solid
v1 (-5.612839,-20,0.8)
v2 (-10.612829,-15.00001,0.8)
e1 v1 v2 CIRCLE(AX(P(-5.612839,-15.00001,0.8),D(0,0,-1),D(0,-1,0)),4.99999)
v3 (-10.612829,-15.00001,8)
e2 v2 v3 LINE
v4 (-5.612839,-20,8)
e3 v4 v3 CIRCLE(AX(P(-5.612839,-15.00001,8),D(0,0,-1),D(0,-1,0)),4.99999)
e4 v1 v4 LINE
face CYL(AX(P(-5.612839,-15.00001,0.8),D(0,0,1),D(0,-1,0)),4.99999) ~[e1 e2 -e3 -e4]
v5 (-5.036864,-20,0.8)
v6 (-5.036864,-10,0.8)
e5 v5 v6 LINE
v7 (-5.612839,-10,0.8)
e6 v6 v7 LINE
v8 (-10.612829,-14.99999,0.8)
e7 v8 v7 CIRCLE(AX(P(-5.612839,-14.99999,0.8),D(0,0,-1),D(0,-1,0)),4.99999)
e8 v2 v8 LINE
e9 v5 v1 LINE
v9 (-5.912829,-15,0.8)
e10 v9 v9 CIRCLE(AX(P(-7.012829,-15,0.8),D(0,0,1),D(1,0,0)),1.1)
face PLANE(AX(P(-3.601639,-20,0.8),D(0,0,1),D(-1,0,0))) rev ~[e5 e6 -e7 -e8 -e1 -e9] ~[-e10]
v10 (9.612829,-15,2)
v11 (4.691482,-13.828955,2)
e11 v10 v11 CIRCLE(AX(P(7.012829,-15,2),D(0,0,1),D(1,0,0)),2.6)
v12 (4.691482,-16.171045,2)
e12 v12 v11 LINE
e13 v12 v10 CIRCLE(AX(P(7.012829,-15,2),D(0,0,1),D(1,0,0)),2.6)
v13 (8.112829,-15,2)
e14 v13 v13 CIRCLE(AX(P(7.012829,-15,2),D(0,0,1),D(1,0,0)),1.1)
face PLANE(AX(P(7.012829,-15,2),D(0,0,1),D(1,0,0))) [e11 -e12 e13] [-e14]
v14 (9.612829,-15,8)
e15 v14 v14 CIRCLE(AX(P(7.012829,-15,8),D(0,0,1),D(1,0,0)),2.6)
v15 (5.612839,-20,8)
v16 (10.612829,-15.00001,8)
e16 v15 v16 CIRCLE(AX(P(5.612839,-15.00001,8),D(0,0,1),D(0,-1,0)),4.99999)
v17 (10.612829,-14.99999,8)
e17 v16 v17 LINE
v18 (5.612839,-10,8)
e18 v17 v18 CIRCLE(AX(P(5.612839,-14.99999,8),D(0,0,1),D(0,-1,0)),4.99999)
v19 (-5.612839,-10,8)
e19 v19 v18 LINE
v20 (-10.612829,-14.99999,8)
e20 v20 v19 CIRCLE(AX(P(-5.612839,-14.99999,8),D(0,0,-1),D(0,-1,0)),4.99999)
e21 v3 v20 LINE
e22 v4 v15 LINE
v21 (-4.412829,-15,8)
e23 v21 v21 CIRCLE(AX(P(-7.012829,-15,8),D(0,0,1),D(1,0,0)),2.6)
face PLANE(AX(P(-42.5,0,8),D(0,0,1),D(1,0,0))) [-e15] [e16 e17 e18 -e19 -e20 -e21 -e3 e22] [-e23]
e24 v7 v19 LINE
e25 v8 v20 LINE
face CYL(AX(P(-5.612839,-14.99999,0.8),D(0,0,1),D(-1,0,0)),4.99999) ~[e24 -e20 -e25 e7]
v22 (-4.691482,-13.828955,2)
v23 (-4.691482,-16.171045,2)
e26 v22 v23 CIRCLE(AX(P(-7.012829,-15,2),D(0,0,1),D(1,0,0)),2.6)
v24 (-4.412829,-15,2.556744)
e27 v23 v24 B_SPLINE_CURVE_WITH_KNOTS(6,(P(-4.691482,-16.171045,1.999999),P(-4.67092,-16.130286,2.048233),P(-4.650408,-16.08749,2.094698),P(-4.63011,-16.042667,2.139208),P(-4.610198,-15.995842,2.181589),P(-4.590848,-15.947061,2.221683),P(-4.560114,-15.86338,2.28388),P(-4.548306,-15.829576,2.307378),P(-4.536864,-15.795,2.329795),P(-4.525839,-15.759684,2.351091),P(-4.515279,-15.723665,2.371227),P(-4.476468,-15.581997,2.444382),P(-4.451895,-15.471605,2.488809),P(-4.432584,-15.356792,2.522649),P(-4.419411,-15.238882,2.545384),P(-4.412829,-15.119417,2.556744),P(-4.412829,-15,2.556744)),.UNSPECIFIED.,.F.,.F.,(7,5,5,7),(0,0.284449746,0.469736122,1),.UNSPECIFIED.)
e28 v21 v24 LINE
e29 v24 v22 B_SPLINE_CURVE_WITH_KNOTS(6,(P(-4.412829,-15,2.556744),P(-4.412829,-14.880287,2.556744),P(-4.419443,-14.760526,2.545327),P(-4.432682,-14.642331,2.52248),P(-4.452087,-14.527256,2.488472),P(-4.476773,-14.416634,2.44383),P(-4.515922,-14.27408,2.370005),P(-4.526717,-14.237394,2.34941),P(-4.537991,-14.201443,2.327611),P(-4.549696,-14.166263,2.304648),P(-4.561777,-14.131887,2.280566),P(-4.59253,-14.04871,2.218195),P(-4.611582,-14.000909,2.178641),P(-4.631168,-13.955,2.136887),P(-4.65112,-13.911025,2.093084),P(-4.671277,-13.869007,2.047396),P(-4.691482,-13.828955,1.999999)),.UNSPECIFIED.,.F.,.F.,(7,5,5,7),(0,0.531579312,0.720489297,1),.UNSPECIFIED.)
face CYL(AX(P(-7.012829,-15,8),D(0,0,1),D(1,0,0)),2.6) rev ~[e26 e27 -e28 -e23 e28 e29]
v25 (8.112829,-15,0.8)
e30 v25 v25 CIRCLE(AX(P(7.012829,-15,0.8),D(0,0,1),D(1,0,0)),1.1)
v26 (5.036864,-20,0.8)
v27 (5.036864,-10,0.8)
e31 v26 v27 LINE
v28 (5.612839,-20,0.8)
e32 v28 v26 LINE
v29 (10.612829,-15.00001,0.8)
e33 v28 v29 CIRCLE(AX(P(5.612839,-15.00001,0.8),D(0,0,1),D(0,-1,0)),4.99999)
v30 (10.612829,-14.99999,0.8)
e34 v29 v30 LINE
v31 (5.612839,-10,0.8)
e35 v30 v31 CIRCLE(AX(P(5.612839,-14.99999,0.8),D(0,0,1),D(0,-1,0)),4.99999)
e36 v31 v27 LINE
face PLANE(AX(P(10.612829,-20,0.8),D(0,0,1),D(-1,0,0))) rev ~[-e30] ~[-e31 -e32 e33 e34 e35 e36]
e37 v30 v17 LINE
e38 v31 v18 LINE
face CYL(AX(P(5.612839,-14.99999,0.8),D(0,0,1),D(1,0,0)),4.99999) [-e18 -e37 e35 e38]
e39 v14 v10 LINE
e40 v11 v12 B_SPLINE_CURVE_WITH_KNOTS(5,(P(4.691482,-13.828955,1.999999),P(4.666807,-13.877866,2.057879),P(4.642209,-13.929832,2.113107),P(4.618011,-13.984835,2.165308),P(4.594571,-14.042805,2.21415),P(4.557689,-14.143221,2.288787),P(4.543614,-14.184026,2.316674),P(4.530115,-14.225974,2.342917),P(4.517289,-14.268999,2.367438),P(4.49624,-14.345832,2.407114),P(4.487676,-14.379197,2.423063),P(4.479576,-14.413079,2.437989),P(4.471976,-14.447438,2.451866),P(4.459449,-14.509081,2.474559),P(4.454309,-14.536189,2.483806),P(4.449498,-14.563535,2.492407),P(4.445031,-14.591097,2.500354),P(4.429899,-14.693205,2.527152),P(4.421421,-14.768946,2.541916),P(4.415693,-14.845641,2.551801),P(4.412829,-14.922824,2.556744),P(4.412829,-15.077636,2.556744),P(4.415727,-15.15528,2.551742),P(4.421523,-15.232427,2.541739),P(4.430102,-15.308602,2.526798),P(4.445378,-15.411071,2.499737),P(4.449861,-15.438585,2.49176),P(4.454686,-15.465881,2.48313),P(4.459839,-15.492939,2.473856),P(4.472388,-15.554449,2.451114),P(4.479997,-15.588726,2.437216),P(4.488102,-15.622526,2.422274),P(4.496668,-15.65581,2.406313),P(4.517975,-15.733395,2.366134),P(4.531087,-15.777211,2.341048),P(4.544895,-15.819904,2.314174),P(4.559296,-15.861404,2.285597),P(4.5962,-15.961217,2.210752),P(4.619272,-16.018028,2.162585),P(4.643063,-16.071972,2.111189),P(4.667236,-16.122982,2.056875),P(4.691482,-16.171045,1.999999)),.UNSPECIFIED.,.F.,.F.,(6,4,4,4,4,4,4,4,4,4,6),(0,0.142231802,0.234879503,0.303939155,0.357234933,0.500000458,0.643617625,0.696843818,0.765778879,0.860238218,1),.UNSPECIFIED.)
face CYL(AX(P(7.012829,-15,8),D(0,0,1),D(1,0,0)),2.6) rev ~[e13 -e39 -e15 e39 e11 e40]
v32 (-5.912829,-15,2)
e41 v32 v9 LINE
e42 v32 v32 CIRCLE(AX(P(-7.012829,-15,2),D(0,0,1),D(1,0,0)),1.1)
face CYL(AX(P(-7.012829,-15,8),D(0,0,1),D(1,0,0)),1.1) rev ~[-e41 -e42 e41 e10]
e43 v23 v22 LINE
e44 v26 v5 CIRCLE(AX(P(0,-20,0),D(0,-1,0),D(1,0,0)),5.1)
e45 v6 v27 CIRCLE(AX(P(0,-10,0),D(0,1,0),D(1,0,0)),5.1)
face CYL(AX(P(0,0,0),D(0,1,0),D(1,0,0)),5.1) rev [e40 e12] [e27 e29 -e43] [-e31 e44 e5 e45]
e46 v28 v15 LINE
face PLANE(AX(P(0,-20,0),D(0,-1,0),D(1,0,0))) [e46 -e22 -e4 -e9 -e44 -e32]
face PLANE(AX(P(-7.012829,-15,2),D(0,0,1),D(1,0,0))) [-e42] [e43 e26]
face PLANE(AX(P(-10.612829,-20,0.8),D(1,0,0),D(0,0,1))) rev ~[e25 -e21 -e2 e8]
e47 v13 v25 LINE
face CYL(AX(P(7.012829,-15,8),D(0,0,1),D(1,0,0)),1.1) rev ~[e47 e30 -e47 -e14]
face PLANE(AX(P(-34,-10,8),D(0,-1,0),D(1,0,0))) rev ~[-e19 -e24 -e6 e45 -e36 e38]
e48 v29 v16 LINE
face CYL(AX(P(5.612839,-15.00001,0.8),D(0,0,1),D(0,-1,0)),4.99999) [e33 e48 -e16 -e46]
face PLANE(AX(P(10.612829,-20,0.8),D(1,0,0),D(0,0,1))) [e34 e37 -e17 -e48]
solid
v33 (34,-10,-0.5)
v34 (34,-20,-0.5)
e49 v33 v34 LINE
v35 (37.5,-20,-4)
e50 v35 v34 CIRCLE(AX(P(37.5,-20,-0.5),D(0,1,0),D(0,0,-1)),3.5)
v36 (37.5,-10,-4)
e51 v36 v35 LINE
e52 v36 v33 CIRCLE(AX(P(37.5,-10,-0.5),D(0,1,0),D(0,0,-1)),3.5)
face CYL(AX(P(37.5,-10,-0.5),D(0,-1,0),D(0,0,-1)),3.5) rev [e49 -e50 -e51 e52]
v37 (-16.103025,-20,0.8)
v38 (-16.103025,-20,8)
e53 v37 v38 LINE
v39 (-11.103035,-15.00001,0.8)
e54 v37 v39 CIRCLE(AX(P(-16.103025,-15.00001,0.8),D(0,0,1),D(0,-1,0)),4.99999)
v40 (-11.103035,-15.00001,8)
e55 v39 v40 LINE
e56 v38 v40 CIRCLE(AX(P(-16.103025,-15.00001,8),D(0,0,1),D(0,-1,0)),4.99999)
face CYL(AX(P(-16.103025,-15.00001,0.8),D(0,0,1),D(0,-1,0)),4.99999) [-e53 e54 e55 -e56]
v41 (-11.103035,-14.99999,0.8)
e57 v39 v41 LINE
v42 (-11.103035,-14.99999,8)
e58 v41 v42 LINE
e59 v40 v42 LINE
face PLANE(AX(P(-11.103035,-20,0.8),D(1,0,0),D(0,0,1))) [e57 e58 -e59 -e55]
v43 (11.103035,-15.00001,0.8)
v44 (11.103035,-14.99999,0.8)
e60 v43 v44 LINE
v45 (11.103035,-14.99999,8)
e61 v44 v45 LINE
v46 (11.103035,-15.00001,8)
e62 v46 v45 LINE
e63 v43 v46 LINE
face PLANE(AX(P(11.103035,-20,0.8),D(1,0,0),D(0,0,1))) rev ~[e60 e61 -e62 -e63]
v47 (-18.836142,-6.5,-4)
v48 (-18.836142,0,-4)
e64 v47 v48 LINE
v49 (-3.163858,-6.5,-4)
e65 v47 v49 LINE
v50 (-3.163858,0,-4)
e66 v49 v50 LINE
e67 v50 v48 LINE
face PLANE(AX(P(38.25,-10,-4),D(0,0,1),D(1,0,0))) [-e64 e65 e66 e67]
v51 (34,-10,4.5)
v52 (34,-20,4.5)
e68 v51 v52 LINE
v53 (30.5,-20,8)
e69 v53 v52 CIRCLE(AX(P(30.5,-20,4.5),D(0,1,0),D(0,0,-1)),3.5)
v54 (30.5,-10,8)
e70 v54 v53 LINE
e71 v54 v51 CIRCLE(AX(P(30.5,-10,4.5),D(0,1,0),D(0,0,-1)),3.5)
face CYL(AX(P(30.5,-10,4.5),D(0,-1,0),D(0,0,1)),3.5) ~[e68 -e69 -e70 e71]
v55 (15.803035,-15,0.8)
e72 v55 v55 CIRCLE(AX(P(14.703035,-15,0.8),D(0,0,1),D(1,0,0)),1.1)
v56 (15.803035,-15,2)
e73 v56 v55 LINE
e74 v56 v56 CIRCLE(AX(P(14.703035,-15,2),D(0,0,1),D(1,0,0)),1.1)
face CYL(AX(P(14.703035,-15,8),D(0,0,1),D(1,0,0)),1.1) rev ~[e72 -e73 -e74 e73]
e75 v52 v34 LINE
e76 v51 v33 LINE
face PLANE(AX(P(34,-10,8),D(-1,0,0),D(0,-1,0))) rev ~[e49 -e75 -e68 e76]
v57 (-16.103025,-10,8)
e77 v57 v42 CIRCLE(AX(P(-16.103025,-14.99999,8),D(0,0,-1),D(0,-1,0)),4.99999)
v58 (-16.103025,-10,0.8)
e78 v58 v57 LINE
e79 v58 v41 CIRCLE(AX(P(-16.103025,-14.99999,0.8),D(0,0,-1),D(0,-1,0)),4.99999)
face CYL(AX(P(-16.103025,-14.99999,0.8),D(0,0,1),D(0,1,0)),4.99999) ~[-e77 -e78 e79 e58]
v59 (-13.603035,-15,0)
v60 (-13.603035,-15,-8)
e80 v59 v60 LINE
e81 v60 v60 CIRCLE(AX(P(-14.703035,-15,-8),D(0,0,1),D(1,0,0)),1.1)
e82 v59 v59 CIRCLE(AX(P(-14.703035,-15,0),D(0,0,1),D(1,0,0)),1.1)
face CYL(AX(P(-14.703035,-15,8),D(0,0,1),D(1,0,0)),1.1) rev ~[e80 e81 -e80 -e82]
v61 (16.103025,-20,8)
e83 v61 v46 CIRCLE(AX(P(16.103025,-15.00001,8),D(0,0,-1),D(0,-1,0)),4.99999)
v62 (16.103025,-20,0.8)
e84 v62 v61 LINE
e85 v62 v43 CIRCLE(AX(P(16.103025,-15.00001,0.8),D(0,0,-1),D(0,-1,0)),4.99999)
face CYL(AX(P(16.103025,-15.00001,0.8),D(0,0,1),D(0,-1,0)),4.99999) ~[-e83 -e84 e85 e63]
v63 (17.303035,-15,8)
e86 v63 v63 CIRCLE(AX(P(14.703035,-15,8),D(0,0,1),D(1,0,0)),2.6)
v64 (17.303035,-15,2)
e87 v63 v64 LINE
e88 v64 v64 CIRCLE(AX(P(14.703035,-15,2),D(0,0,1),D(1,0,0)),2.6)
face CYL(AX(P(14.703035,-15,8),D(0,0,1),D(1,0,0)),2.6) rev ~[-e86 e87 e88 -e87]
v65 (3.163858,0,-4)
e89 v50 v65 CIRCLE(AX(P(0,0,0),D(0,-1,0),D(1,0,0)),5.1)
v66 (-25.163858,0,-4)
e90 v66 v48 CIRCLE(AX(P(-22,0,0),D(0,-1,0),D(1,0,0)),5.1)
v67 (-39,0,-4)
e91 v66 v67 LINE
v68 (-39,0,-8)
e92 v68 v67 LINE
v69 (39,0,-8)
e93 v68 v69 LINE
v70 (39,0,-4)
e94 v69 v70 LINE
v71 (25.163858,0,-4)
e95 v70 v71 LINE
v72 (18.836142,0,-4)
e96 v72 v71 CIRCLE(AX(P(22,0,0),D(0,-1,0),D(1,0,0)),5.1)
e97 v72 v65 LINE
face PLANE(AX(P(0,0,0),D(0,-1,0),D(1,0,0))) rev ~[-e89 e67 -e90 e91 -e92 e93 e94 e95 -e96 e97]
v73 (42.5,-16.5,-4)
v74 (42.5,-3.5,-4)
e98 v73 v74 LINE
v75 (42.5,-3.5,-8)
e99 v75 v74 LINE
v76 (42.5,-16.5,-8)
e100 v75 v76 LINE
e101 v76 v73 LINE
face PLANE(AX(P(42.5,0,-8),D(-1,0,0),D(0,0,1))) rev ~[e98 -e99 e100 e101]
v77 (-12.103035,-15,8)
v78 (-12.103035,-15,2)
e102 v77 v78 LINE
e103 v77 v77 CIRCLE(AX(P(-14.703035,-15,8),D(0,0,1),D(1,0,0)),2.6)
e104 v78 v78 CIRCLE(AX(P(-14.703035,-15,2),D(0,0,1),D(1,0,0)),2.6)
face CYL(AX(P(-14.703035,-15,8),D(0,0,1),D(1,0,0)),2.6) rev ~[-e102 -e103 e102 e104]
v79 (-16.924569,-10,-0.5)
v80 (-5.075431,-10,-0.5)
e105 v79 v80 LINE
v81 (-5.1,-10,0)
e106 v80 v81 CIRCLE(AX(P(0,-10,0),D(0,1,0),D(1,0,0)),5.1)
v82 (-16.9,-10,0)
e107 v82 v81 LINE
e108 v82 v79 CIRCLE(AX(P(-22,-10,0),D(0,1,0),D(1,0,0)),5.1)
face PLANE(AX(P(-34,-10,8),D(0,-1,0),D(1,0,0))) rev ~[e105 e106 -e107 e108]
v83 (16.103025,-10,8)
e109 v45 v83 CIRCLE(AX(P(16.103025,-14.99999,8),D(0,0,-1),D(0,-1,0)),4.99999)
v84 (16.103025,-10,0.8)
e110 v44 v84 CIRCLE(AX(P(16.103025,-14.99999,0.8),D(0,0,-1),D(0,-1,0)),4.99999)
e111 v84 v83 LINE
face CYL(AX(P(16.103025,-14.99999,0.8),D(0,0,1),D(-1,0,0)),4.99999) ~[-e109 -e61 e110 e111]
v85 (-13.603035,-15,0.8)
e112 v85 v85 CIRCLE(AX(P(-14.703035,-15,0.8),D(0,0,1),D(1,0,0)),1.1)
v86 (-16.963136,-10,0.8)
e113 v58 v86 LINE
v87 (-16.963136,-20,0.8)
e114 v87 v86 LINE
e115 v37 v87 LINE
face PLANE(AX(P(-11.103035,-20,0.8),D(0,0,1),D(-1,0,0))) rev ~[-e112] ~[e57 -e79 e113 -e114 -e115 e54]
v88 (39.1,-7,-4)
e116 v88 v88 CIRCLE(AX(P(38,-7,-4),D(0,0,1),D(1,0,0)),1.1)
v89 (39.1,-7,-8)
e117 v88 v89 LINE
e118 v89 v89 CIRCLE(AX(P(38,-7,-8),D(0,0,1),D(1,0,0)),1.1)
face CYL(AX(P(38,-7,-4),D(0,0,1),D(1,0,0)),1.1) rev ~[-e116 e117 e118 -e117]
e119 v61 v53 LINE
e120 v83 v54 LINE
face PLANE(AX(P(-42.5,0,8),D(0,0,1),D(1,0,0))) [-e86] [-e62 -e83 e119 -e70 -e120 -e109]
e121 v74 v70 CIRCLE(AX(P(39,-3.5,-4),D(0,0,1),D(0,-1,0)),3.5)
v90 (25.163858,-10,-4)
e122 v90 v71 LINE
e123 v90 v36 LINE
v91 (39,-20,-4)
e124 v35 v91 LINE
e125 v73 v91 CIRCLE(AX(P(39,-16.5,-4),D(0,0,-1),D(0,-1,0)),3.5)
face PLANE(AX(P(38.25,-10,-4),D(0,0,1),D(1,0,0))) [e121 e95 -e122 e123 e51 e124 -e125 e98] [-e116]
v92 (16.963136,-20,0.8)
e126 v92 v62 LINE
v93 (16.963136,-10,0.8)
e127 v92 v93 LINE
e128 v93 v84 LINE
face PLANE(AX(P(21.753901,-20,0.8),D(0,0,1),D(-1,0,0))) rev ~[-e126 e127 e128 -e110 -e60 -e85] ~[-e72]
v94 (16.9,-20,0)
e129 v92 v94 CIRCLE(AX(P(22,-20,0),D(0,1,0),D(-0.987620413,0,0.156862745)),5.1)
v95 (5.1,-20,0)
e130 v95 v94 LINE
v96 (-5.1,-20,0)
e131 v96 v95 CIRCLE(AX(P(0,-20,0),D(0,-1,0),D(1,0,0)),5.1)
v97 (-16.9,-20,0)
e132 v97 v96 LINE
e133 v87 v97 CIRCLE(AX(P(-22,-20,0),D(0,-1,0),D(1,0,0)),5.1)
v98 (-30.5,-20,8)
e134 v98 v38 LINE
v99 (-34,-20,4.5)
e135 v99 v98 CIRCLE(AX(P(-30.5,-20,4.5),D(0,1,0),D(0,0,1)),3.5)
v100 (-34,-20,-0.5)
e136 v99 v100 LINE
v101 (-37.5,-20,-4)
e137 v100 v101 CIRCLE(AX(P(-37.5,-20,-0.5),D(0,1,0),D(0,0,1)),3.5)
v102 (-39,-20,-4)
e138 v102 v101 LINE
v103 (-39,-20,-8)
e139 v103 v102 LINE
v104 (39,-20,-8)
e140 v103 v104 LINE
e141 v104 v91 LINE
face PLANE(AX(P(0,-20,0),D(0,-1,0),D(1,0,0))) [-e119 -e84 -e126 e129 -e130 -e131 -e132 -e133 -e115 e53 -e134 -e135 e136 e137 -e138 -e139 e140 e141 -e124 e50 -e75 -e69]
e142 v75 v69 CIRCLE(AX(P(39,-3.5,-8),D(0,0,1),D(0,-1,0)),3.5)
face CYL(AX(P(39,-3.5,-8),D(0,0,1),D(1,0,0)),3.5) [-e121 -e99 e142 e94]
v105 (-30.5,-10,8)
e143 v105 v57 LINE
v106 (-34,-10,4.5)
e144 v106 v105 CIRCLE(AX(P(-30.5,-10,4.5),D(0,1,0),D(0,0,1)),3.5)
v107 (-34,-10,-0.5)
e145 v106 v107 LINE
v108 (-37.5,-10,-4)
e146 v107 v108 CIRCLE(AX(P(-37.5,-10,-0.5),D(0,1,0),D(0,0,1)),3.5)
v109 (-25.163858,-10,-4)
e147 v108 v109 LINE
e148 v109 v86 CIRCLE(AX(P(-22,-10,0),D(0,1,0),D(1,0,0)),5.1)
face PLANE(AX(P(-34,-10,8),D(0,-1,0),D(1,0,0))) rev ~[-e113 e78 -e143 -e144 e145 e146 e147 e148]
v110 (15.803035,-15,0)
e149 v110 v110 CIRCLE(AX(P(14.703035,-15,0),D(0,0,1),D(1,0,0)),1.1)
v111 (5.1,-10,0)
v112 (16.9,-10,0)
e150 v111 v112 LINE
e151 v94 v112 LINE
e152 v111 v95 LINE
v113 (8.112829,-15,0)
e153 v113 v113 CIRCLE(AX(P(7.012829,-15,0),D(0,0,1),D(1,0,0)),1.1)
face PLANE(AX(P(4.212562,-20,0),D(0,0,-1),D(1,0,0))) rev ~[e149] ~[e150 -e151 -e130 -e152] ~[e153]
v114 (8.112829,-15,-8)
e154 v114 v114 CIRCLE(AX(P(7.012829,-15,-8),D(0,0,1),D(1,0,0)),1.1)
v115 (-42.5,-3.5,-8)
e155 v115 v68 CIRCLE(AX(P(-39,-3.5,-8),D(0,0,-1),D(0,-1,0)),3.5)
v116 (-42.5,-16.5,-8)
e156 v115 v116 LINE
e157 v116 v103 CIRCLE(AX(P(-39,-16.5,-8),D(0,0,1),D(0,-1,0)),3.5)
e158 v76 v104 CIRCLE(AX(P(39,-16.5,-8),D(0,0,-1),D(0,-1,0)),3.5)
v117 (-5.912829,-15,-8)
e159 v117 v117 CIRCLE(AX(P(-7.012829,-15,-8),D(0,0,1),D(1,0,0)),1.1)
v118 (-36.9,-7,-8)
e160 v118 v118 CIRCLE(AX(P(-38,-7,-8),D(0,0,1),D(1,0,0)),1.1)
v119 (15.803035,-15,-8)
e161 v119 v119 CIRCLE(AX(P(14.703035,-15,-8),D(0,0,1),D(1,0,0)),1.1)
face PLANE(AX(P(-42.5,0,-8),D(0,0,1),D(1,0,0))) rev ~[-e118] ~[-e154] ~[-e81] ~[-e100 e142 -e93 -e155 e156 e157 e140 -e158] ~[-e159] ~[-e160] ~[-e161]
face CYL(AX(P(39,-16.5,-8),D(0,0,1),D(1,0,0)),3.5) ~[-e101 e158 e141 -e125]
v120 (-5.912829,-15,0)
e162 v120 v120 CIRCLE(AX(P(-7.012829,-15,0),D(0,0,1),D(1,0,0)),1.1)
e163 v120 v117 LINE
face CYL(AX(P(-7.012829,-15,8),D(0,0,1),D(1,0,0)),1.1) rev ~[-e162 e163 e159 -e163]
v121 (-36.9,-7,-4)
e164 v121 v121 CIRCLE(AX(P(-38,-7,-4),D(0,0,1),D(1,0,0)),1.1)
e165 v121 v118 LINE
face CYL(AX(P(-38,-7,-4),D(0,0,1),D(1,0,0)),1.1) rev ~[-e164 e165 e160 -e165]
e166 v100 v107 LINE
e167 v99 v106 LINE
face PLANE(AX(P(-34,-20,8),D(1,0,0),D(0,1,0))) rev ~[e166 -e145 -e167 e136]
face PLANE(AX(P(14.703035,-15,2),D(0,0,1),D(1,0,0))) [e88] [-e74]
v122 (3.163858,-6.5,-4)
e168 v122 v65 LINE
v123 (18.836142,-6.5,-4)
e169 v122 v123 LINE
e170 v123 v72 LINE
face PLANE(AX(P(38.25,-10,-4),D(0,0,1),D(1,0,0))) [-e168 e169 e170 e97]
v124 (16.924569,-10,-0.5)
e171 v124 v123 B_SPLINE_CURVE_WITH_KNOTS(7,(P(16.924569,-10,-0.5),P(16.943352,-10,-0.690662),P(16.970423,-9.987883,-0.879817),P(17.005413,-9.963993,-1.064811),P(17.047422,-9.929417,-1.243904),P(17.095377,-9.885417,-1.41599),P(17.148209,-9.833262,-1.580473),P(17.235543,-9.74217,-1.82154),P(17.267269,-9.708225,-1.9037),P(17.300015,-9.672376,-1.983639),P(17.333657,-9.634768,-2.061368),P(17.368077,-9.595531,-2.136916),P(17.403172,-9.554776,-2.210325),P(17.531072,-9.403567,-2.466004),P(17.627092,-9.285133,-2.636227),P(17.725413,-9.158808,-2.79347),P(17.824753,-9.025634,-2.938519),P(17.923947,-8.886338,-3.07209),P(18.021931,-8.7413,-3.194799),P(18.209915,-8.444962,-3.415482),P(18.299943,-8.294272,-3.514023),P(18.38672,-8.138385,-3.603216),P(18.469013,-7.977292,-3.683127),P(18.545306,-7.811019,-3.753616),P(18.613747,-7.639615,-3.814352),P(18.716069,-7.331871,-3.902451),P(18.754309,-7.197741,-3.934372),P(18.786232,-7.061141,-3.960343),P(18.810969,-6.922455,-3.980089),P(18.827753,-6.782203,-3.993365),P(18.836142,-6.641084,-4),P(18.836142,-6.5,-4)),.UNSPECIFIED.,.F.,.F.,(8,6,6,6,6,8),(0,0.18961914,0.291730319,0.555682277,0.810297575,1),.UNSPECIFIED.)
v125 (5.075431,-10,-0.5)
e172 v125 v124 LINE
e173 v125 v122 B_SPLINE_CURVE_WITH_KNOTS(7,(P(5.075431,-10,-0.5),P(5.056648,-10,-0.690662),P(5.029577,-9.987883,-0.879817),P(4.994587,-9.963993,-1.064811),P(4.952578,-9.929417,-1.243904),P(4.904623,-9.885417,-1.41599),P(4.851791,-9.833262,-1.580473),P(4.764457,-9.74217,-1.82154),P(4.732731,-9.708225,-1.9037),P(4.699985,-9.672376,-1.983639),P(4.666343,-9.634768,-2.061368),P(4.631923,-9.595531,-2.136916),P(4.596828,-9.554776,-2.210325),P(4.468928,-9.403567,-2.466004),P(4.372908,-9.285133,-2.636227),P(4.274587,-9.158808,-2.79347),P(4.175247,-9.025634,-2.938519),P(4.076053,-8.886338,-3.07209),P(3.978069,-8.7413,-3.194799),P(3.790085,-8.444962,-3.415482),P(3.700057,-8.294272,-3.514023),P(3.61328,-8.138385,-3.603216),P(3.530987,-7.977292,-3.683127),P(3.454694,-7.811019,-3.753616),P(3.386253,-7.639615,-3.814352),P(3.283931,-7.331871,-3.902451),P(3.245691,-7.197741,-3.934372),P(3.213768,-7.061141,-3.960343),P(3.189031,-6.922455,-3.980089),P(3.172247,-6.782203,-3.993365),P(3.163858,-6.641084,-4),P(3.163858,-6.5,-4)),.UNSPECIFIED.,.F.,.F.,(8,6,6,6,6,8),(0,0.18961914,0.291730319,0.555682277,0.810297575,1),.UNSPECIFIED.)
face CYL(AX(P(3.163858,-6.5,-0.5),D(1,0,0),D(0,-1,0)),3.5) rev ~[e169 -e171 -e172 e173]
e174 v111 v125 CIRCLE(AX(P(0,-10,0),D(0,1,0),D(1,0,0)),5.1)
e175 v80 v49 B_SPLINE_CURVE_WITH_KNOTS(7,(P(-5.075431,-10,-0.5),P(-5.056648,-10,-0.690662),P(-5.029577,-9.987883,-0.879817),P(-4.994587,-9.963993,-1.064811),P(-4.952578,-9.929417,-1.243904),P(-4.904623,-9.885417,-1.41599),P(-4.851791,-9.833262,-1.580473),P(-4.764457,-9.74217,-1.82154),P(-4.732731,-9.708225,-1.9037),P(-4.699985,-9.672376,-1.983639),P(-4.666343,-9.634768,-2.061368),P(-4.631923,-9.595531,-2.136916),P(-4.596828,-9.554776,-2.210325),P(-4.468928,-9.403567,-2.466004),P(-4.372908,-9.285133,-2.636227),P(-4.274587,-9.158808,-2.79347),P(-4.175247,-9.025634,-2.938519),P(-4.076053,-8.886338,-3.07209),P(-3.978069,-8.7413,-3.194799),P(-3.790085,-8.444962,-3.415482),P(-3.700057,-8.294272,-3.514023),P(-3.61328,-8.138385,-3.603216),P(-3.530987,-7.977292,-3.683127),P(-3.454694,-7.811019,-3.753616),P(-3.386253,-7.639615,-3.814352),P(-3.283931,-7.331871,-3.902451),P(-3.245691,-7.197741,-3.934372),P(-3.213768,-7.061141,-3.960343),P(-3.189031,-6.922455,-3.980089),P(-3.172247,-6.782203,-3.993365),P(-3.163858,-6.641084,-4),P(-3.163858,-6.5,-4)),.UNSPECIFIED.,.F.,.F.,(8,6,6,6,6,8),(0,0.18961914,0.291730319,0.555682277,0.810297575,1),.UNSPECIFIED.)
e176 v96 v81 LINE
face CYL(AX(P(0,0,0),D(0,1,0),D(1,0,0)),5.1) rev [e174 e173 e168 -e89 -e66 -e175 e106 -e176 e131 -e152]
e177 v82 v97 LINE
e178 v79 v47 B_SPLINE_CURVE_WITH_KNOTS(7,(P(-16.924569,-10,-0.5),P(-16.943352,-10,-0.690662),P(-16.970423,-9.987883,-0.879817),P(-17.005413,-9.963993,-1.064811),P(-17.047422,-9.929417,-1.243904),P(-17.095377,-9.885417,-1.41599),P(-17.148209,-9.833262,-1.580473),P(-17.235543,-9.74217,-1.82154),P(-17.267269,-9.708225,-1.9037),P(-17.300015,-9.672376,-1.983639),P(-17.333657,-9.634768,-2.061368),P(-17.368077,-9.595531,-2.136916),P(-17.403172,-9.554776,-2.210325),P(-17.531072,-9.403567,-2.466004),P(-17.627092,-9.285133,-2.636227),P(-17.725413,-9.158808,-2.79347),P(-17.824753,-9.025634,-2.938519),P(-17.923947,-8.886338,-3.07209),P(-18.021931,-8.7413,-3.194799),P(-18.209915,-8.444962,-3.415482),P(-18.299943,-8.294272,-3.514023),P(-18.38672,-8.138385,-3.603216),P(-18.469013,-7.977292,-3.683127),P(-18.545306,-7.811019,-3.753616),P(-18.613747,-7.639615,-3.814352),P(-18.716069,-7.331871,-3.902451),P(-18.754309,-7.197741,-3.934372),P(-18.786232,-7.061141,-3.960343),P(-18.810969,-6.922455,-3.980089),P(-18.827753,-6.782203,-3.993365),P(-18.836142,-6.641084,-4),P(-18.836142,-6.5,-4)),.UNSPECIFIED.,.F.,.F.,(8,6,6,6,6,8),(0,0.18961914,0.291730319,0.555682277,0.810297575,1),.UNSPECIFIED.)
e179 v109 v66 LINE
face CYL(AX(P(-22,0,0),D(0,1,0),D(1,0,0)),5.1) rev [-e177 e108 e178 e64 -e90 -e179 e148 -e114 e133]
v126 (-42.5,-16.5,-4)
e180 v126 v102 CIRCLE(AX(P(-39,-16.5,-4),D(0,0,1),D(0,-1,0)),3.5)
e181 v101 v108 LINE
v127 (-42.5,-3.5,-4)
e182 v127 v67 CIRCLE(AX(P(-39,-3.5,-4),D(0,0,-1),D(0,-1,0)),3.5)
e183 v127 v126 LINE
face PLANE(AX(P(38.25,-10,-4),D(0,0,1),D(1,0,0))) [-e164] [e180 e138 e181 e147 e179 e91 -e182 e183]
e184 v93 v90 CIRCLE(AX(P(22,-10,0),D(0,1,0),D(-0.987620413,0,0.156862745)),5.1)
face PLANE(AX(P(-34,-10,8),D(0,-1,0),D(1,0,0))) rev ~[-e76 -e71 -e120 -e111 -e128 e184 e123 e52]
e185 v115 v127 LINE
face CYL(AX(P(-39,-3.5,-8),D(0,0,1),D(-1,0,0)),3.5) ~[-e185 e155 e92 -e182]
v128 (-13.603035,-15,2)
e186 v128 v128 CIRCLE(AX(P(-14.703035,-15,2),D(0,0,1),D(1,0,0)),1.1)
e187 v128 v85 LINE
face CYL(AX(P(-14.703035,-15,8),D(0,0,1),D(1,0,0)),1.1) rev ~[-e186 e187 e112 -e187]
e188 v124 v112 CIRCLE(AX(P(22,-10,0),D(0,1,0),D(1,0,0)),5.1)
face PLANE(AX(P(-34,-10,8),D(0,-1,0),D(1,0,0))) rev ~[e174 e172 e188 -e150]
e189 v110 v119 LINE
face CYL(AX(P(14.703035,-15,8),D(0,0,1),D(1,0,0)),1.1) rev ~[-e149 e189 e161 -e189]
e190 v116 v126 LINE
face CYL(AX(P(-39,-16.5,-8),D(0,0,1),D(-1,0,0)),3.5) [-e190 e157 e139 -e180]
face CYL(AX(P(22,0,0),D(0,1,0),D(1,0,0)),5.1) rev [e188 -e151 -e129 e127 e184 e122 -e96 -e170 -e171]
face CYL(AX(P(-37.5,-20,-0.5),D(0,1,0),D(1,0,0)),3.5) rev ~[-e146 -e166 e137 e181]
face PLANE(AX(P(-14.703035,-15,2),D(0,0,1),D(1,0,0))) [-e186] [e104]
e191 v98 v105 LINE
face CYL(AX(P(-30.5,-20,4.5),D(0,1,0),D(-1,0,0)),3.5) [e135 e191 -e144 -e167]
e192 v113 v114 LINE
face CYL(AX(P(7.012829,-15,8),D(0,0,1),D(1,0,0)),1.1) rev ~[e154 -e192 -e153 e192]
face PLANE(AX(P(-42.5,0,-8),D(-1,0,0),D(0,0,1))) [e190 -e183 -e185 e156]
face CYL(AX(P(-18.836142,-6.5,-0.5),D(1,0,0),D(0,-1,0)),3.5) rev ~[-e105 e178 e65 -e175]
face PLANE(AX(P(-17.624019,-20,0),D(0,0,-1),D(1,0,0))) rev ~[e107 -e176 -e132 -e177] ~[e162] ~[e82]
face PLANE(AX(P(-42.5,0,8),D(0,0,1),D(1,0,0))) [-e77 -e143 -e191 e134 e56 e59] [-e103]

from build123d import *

# Parameters (mm, degrees)
F0_W      = 85
F0_H      = 16
F0_R      = 5.1
F1_DEPTH  = 20
F2_W      = 68
F2_H      = 10
F3_DEPTH  = 12
F4_W      = 0.4902059005
F4_H      = 7.2
F5_DEPTH  = 25
F6_R      = 3.5
F7_R      = 1.1
F8_DEPTH  = 25
F9_R      = 4.99999
F10_R     = 1.1
F11_DEPTH = 25
F12_R     = 2.6
F12_R_2   = 1.1
F13_DEPTH = 6


# Not quite as in the source:
# - a fillet or chamfer is up to 0.001 mm smaller than in the source, because OpenCascade refuses the exact size


with BuildPart() as f1:
    # F0 (on Front) → F1 (new body)
    with BuildSketch(Plane.XZ):
        Rectangle(F0_W, F0_H)
        with Locations((-22, 0)):
            Circle(F0_R, mode=Mode.SUBTRACT)
        Circle(F0_R, mode=Mode.SUBTRACT)
        with Locations((22, 0)):
            Circle(F0_R, mode=Mode.SUBTRACT)
    extrude(amount=F1_DEPTH)

    # F2 (on face) → F3 (cut)
    with BuildSketch(Plane.XY.offset(8)):
        Polygon((42.5, -20), (42.5, 0), (34, 0), (34, -10), (34, -20), align=None)
        with Locations((0, -5)):
            Rectangle(F2_W, F2_H)
        Polygon((-34, -10), (-34, 0), (-42.5, 0), (-42.5, -20), (-34, -20), align=None)
    extrude(amount=-F3_DEPTH, mode=Mode.SUBTRACT)

    # F4 (on face) → F5 (cut)
    with BuildSketch(Plane.XZ.offset(20)):
        Polygon((-11.1030349508, 0.8), (-17.6240189229, 0.8), (-17.6240189229, 0), (-3.6016391778, 0), (-3.6016391778, 0.8), (-10.6128290503, 0.8), align=None)
        with Locations((-10.8579320006, 4.4)):
            Rectangle(F4_W, F4_H)
        Polygon((4.212562261, 0.8), (4.212562261, 0), (21.7539005794, 0), (21.7539005794, 0.8), (11.1030349508, 0.8), (10.6128290503, 0.8), align=None)
        with Locations((10.8579320006, 4.4)):
            Rectangle(F4_W, F4_H)
    extrude(amount=-F5_DEPTH, mode=Mode.SUBTRACT)

    # F6
    f6_edges = [f1.edges().sort_by_distance(p)[0] for p in [
        (-34, -15, 8),
        (34, -15, 8),
        (-34, -15, -4),
        (34, -15, -4),
        (-42.5, -20, -6),
        (-42.5, 0, -6),
        (42.5, -20, -6),
        (42.5, 0, -6),
        (11, -10, -4),
        (-11, -10, -4),
    ]]
    fillet(f6_edges, radius=F6_R)

    # F7 (on face) → F8 (cut)
    with BuildSketch(Plane.XY.offset(8)):
        with Locations((-14.7030349508, -15)):
            Circle(F7_R)
        with Locations((-7.0128290503, -15)):
            Circle(F7_R)
        with Locations((7.0128290503, -15)):
            Circle(F7_R)
        with Locations((14.7030349508, -15)):
            Circle(F7_R)
    extrude(amount=-F8_DEPTH, mode=Mode.SUBTRACT)

    # F9 (radius 5 in the source; OpenCascade refuses exactly that, so slightly less here)
    f9_edges = [f1.edges().sort_by_distance(p)[0] for p in [
        (-11.103035, -20, 4.4),
        (-10.612829, -20, 4.4),
        (10.612829, -20, 4.4),
        (11.103035, -20, 4.4),
        (11.103035, -10, 4.4),
        (10.612829, -10, 4.4),
        (-10.612829, -10, 4.4),
        (-11.103035, -10, 4.4),
    ]]
    fillet(f9_edges, radius=F9_R)

    # F10 (on face) → F11 (cut)
    with BuildSketch(Plane.XY.offset(-4)):
        with Locations((38, -7)):
            Circle(F10_R)
        with Locations((-38, -7)):
            Circle(F10_R)
    extrude(amount=-F11_DEPTH, mode=Mode.SUBTRACT)

    # F12 (on face) → F13 (cut)
    with BuildSketch(Plane.XY.offset(8)):
        with Locations((-14.7030349508, -15)):
            Circle(F12_R)
        with Locations((-7.0128290503, -15)):
            Circle(F12_R)
        with Locations((-7.0128290503, -15)):
            Circle(F12_R_2, mode=Mode.SUBTRACT)
        with Locations((7.0128290503, -15)):
            Circle(F12_R)
        with Locations((7.0128290503, -15)):
            Circle(F12_R_2, mode=Mode.SUBTRACT)
        with Locations((14.7030349508, -15)):
            Circle(F12_R)
    extrude(amount=-F13_DEPTH, mode=Mode.SUBTRACT)


solid = f1.part
